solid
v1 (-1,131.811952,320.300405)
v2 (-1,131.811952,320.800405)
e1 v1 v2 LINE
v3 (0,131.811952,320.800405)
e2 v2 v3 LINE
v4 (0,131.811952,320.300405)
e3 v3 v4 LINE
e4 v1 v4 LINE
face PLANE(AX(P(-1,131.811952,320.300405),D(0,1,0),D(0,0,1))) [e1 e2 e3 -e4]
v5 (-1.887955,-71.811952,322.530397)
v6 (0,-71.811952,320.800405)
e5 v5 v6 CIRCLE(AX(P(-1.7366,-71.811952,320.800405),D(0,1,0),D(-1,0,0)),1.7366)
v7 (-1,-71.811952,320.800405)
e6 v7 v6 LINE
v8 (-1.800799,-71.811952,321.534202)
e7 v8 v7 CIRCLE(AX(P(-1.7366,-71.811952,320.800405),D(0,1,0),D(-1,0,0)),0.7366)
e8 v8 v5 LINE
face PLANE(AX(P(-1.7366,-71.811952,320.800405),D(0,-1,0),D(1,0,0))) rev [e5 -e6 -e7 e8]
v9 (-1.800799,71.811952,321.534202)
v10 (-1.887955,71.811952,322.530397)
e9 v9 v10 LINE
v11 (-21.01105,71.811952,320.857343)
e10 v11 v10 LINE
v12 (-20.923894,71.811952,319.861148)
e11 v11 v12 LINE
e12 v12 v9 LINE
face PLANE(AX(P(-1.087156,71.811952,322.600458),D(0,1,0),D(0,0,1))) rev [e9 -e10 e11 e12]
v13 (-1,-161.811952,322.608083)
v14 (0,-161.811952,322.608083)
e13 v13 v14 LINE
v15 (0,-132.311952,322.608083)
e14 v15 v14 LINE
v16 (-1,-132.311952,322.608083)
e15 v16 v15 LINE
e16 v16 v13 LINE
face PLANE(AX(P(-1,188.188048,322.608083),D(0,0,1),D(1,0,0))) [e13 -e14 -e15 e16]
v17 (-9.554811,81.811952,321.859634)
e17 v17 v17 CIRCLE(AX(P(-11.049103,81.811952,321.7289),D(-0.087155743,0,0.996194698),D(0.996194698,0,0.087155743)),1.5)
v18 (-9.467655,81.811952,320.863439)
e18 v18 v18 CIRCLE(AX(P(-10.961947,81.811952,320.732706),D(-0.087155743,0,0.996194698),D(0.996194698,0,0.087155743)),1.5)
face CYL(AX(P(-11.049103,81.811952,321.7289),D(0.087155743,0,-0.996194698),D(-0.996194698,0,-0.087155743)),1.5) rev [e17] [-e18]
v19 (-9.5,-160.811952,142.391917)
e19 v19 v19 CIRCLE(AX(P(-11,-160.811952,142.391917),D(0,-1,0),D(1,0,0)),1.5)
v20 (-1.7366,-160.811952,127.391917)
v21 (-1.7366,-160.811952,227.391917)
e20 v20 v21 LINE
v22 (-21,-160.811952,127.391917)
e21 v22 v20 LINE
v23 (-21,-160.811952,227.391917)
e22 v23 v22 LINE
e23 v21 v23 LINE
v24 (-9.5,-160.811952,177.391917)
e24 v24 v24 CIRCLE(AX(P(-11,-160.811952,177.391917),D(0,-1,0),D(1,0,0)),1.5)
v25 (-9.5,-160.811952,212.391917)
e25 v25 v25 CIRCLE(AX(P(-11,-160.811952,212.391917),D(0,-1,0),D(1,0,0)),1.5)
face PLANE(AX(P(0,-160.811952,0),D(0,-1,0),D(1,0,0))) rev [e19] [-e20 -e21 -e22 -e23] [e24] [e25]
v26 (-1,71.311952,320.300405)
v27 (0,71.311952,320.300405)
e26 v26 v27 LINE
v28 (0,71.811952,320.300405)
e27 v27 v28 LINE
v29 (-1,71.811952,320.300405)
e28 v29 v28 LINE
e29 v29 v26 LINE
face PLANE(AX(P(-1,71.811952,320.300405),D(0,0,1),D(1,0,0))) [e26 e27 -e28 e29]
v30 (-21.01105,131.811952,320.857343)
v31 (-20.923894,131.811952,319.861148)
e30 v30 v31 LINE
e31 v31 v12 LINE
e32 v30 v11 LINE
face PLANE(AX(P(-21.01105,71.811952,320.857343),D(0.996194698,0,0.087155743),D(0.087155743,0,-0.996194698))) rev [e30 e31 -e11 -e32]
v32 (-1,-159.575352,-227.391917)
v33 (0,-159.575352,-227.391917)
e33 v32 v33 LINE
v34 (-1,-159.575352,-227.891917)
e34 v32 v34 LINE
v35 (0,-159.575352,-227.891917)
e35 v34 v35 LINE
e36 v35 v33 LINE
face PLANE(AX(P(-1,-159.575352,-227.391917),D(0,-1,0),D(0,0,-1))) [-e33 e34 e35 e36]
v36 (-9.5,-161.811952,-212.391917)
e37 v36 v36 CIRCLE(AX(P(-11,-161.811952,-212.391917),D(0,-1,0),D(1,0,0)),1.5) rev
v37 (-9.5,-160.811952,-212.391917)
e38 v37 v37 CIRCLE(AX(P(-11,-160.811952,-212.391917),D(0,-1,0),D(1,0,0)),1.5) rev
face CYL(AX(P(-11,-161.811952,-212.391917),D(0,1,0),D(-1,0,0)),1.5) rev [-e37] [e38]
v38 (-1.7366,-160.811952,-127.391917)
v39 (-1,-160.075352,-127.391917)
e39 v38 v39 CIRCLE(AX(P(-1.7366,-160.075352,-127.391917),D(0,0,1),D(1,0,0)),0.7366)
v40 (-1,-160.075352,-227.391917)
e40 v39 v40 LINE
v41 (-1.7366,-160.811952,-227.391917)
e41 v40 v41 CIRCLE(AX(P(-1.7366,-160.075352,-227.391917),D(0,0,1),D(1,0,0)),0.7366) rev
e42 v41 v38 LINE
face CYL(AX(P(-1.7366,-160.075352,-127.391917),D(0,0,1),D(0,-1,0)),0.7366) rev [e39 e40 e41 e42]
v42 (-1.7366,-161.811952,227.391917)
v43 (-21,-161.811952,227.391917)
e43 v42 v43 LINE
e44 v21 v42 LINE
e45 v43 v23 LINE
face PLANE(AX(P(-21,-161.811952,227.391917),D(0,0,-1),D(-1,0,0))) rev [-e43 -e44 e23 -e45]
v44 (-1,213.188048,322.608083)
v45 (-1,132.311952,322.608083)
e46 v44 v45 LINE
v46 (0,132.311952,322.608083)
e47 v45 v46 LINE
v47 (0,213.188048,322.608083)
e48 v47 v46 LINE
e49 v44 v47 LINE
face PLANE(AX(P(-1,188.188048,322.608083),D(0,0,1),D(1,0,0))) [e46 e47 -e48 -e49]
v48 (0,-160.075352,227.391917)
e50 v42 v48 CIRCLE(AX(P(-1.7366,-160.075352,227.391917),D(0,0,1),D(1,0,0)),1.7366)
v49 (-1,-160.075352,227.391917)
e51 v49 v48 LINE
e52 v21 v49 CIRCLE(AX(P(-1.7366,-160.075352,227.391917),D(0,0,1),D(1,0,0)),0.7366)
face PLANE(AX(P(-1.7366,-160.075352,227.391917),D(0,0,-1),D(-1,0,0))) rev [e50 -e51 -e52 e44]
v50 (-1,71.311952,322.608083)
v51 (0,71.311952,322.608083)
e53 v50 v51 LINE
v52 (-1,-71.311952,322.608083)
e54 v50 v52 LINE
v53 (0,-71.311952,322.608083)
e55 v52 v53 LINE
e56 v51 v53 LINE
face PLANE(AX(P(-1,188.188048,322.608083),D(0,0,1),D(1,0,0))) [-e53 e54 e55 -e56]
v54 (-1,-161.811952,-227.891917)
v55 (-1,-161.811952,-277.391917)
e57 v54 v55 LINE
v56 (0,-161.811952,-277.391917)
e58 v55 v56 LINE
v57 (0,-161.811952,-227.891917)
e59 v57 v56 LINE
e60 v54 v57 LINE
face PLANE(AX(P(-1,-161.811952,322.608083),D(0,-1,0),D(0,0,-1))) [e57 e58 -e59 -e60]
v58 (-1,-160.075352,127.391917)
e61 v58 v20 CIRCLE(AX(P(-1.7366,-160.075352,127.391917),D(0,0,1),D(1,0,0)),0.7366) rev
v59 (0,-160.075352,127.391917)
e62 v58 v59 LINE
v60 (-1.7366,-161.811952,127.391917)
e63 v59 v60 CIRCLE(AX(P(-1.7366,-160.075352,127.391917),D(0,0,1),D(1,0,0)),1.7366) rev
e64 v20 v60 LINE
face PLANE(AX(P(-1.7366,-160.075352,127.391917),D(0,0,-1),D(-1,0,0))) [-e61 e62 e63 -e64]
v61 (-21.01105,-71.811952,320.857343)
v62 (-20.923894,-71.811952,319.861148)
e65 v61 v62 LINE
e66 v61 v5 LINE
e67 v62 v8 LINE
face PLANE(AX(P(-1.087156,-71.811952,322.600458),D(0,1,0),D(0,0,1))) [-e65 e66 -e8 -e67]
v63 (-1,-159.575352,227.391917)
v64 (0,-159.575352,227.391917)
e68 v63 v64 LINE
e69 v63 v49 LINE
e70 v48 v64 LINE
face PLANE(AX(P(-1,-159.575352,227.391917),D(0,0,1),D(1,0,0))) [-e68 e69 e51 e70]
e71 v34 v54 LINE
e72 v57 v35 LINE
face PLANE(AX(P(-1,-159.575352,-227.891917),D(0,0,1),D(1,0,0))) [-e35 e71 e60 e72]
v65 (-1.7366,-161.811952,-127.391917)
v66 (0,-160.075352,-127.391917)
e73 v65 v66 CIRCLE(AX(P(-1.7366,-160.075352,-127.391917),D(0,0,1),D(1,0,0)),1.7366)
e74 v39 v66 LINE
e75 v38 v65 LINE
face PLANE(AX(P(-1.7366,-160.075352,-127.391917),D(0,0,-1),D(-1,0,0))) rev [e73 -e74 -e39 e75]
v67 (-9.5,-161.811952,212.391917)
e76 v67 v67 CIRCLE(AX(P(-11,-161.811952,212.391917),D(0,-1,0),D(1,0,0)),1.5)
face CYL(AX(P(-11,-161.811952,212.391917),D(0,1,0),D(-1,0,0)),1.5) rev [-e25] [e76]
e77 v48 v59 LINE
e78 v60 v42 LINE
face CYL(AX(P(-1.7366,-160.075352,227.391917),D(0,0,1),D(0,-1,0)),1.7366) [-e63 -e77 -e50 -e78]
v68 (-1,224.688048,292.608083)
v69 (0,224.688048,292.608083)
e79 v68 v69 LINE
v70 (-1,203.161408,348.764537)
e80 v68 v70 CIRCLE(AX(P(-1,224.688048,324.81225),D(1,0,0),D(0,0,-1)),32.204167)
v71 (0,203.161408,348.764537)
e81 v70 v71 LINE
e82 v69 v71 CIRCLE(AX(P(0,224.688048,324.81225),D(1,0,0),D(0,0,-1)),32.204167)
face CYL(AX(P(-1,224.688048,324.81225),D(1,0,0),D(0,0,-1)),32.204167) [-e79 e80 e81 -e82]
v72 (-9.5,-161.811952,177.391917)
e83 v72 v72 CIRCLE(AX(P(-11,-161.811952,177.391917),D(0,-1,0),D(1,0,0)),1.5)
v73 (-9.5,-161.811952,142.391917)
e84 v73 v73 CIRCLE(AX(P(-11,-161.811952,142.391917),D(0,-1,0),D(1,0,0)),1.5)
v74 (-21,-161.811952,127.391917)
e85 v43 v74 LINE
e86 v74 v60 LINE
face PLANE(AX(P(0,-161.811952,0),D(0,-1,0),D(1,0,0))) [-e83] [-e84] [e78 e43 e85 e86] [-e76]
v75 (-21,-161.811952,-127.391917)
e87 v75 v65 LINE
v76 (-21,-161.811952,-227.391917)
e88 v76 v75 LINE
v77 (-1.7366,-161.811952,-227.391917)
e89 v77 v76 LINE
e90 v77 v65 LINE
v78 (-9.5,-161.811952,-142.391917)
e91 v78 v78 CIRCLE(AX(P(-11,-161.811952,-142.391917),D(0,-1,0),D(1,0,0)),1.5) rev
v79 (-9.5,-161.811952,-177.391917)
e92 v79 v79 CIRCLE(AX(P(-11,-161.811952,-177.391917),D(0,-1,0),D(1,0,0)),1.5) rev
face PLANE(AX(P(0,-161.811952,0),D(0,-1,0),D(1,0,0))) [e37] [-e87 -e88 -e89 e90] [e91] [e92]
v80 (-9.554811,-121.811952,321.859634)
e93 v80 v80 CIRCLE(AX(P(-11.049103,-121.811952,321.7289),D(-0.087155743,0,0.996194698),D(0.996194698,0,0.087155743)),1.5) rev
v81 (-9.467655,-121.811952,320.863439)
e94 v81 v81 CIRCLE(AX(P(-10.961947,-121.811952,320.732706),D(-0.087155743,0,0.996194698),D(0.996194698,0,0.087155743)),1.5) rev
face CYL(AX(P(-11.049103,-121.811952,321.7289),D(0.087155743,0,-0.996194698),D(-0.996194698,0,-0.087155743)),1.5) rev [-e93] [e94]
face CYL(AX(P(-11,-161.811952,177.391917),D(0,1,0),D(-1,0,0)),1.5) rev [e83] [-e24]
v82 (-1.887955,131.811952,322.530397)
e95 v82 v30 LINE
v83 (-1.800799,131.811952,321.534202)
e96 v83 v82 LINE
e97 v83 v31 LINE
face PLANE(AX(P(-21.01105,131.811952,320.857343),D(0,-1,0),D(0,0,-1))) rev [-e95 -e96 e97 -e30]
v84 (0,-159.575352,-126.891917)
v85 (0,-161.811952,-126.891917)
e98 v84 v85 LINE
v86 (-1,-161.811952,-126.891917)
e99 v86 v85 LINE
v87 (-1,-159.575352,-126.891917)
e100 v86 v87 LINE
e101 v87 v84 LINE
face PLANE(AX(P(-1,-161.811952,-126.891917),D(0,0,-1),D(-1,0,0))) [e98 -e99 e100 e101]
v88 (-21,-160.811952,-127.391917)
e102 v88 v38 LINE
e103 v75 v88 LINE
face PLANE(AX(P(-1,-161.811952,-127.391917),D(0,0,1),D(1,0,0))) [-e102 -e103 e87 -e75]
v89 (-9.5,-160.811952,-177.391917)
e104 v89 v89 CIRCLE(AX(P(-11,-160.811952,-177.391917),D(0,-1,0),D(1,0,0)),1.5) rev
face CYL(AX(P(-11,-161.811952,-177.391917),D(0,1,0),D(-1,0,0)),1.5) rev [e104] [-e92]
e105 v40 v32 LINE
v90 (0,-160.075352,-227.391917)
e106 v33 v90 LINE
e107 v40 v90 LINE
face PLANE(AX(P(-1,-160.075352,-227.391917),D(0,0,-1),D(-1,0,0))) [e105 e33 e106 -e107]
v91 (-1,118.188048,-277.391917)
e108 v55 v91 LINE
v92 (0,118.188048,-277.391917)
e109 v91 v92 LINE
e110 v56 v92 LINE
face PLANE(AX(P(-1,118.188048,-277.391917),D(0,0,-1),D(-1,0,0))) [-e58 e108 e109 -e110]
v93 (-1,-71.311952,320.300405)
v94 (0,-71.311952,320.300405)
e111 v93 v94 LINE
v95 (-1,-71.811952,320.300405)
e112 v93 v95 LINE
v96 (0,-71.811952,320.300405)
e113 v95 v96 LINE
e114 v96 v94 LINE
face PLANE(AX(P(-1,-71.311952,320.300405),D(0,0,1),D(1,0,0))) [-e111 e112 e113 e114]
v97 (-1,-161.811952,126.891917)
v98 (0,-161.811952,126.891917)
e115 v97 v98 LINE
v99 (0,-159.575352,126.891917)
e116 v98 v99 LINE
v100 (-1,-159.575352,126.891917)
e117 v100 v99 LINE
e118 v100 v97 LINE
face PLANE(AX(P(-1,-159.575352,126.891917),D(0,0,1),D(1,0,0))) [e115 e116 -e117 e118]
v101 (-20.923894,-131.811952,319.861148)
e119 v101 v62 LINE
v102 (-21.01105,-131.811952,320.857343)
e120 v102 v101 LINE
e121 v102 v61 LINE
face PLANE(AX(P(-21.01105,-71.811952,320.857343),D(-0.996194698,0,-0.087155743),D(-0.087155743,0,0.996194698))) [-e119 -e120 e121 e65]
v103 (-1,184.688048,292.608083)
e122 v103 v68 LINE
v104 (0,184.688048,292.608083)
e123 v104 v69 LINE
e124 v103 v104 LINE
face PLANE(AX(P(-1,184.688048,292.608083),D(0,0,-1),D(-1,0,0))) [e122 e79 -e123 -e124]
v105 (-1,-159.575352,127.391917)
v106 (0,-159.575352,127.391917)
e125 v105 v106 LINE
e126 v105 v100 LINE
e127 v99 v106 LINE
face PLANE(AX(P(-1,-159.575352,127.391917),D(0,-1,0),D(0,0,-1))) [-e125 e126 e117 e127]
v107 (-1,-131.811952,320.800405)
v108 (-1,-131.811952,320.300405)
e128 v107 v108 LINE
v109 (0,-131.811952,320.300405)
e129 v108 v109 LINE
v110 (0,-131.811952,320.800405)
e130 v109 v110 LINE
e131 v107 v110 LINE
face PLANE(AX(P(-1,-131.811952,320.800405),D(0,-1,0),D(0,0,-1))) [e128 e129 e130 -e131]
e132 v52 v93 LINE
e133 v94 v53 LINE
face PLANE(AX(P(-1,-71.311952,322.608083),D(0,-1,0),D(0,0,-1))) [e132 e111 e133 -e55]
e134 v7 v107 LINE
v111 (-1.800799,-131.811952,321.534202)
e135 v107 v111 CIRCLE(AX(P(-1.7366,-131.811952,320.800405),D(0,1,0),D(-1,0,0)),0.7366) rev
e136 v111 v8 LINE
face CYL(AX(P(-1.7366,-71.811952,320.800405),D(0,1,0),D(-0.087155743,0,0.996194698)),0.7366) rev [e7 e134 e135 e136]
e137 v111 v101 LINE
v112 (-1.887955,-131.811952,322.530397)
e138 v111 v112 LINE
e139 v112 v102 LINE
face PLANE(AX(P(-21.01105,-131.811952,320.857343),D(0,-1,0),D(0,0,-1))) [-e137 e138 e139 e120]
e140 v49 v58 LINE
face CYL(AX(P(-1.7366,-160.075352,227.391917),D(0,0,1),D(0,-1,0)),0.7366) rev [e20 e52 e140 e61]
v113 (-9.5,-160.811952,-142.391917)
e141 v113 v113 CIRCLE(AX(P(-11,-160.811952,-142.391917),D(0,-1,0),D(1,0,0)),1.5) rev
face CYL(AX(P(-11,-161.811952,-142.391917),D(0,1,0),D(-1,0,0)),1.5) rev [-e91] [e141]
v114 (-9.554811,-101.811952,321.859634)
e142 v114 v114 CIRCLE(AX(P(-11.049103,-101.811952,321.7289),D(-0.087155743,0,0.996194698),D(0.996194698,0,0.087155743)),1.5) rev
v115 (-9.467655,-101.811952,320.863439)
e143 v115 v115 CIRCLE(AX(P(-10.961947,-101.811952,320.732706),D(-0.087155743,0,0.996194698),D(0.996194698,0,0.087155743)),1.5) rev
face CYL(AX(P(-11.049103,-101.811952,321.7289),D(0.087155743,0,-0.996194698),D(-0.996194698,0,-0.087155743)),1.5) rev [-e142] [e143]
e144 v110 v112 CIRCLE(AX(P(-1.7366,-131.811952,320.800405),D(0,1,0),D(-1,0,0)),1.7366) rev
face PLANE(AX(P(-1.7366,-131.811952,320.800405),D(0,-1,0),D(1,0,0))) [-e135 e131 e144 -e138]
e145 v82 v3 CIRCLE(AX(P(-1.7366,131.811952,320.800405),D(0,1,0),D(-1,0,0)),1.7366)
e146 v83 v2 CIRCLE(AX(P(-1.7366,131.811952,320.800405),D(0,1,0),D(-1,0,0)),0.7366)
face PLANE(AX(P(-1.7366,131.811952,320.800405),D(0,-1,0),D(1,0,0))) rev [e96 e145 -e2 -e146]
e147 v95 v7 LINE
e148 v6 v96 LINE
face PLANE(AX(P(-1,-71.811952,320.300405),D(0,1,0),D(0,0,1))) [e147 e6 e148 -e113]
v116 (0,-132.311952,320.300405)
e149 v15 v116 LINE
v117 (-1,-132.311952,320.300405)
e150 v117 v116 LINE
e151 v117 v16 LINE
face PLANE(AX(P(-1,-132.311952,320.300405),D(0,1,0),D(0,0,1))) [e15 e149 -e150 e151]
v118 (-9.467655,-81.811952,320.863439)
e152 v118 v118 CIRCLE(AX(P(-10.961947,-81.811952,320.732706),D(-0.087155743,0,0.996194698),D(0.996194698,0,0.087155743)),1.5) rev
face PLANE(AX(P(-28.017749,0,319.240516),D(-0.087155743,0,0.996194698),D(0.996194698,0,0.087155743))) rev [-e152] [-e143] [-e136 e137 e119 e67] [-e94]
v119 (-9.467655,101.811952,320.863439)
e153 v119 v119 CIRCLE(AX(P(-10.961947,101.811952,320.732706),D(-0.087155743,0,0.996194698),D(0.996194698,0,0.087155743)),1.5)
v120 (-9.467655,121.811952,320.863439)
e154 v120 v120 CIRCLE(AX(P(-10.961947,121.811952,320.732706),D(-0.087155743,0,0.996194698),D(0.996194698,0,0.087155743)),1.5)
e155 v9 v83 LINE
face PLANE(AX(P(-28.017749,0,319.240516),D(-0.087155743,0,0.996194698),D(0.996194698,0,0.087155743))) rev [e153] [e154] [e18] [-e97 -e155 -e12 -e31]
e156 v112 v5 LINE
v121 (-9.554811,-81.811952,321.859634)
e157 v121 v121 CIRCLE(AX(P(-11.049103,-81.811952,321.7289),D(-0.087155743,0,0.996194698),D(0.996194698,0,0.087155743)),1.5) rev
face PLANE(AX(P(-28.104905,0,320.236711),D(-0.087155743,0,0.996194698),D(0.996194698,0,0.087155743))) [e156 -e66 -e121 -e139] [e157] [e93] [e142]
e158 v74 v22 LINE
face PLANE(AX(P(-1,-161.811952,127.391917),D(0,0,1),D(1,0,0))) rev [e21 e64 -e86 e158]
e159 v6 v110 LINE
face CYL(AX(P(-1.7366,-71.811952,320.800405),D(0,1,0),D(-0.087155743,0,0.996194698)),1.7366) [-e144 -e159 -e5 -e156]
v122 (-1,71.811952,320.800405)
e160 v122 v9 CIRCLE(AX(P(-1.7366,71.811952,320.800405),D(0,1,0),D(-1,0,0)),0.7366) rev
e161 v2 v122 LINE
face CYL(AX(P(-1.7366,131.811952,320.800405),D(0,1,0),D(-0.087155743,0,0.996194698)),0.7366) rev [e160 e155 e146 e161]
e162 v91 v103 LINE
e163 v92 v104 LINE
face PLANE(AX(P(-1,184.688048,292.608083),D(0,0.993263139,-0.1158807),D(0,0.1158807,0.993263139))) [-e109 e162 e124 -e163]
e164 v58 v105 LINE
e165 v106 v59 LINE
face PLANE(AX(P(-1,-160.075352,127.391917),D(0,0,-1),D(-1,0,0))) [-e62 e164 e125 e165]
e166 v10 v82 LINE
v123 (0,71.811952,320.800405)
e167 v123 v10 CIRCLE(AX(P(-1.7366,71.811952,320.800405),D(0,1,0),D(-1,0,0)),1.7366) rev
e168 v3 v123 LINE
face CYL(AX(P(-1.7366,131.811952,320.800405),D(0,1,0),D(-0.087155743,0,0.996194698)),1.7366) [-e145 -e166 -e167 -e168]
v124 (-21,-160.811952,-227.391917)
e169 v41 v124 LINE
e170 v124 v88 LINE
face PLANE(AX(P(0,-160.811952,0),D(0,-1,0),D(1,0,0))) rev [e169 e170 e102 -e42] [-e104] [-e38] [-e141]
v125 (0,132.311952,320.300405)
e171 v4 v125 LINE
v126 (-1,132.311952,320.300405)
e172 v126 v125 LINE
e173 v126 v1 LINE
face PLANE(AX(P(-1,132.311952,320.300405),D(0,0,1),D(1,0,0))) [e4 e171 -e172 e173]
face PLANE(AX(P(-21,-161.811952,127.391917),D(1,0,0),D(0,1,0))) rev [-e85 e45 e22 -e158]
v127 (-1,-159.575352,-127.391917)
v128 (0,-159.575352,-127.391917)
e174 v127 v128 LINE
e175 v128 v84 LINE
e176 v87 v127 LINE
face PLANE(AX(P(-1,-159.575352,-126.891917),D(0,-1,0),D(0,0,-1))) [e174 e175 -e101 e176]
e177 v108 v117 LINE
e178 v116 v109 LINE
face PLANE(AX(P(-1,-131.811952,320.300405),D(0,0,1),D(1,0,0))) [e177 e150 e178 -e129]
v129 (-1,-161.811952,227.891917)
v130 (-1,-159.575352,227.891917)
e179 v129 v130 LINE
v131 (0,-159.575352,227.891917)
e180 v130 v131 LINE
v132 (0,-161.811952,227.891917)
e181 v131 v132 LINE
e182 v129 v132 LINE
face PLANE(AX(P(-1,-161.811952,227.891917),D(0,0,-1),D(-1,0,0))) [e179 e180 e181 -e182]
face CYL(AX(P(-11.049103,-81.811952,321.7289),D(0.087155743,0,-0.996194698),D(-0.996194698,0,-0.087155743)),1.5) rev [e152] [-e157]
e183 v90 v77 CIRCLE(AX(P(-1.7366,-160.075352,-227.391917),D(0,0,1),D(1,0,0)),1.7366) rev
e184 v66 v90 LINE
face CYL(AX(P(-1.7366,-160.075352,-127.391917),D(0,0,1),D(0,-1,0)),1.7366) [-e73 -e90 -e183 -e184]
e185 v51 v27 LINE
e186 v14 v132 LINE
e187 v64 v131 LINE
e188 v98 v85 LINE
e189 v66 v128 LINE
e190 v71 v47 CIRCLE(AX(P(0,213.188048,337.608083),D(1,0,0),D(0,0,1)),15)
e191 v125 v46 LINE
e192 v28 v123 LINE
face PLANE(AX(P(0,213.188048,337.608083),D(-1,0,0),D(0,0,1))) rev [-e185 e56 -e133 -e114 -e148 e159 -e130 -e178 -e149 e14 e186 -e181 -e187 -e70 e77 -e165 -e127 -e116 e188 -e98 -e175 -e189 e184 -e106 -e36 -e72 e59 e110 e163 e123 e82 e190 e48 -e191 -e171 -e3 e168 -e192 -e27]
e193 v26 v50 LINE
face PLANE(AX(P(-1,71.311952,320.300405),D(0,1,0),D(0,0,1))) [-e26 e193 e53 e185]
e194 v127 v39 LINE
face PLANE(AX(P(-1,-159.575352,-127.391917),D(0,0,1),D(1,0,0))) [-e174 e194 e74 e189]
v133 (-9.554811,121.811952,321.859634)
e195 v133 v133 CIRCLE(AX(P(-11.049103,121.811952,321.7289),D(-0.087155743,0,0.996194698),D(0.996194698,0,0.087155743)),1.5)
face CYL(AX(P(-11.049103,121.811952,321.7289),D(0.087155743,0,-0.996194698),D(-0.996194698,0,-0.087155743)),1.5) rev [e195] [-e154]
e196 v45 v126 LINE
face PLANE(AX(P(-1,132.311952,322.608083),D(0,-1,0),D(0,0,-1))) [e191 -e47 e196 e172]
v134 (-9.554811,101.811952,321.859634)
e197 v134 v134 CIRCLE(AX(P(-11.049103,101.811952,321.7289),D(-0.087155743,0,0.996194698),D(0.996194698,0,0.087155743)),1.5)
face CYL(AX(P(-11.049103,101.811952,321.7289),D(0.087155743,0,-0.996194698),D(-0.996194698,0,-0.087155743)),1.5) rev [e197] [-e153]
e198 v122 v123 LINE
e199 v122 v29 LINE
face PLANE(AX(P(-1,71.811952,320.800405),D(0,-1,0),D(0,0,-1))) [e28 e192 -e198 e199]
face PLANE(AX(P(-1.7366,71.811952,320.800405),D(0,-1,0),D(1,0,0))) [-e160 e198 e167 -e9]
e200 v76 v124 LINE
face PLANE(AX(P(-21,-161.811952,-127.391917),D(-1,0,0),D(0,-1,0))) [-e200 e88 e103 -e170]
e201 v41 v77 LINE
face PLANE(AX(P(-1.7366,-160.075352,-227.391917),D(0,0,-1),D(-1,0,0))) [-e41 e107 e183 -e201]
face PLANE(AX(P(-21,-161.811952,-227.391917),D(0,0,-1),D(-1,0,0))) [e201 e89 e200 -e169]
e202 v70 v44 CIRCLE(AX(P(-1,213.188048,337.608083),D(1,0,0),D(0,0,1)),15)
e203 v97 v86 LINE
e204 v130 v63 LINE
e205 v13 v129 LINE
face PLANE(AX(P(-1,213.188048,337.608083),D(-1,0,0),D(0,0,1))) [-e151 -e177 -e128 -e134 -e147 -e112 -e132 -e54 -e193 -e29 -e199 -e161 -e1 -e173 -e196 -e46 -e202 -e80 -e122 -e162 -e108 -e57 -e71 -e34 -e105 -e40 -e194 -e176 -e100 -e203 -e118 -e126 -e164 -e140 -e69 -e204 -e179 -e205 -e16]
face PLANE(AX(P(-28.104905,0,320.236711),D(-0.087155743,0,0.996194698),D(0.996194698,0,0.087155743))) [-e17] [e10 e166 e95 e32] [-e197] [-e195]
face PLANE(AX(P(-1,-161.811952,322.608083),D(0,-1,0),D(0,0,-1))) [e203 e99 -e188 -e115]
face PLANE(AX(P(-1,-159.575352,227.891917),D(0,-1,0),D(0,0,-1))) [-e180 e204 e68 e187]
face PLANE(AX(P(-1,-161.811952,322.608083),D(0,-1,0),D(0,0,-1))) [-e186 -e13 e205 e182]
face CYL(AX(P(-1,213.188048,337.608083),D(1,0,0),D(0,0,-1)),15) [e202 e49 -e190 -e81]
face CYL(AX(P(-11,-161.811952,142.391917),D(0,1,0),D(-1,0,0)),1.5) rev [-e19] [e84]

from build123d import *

# Parameters (mm, degrees)
BASE_FLANGE1_DEPTH            = 1
EDGE_FLANGE1_STRIP_W          = 5.4732
EDGE_FLANGE1_STRIP_H          = 1
EDGE_FLANGE1_STRIP_CUT_DEPTH  = 100
EDGE_FLANGE1_RELIEF_W         = 5.9732
EDGE_FLANGE1_RELIEF_H         = 0.5
EDGE_FLANGE1_RELIEF_CUT_DEPTH = 1
EDGE_FLANGE1_DEPTH            = 100
EDGE_FLANGE1_PROFILE_W        = 100
EDGE_FLANGE1_PROFILE_H        = 19.2634
EDGE_FLANGE1_PROFILE_R        = 1.5
EDGE_FLANGE1_FLAT_DEPTH       = 1
EDGE_FLANGE2_START            = -132.311951656
EDGE_FLANGE2_DEPTH            = 61
EDGE_FLANGE2_2_DEPTH          = 0.5
EDGE_FLANGE2_START_2          = -71.811951656
EDGE_FLANGE2_3_DEPTH          = 0.5
EDGE_FLANGE2_START_3          = -131.811951656
EDGE_FLANGE2_4_DEPTH          = 60
EDGE_FLANGE2_START_4          = -321.467617465
EDGE_FLANGE2_5_OUTLINE_R      = 1.5
EDGE_FLANGE2_5_DEPTH          = 1.000000001


with BuildPart() as part:
    # Base-Flange1: sheet metal written as solids
    # Sketch1 → Base-Flange1 (new body)
    with BuildSketch(Plane(origin=(0, 0, 0), x_dir=(0, 0, -1), z_dir=(1, 0, 0))):
        with BuildLine():
            Line((-292.608082875, 184.688048344), (277.391917125, 118.188048344))
            Line((277.391917125, 118.188048344), (277.391917125, -161.811951656))
            Line((277.391917125, -161.811951656), (-322.608082875, -161.811951656))
            Line((-322.608082875, -161.811951656), (-322.608082875, 188.188048344))
            Line((-322.608082875, 188.188048344), (-322.608082875, 213.188048344))
            ThreePointArc((-322.608082875, 213.188048344), (-332.239042701, 199.181856584), (-348.764537222, 203.161407511))
            ThreePointArc((-348.764537222, 203.161407511), (-336.339280516, 254.75856393), (-292.608082875, 224.688048344))
            Line((-292.608082875, 224.688048344), (-292.608082875, 184.688048344))
        make_face()
    extrude(amount=-BASE_FLANGE1_DEPTH)

    # Edge-Flange1: sheet metal written as solids
    # Edge-Flange1 strip (on a plane across the edge) → Edge-Flange1 strip cut (cut)
    with BuildSketch(Plane(origin=(-1, -161.811951656, -227.391917125), x_dir=(0, 1, 0), z_dir=(0, 0, 1))):
        with Locations((-1, -0.5)):
            Rectangle(EDGE_FLANGE1_STRIP_W, EDGE_FLANGE1_STRIP_H)
    edge_flange1_strip_cut = extrude(amount=EDGE_FLANGE1_STRIP_CUT_DEPTH, mode=Mode.SUBTRACT)

    # Edge-Flange1 relief (on the sheet) → Edge-Flange1 relief cut (cut)
    with BuildSketch(Plane(origin=(-1, -160.075351656, -227.391917125), x_dir=(0, 1, 0), z_dir=(-1, 0, 0))):
        with Locations((-2.4866, 0.25)):
            Rectangle(EDGE_FLANGE1_RELIEF_W, EDGE_FLANGE1_RELIEF_H)
        with Locations((-2.4866, -100.25)):
            Rectangle(EDGE_FLANGE1_RELIEF_W, EDGE_FLANGE1_RELIEF_H)
    edge_flange1_relief_cut = extrude(amount=-EDGE_FLANGE1_RELIEF_CUT_DEPTH, mode=Mode.SUBTRACT)

    # Edge-Flange1 bend section (on a plane across the edge) → Edge-Flange1 (add)
    with BuildSketch(Plane(origin=(-1, -161.811951656, -227.391917125), x_dir=(0, 1, 0), z_dir=(0, 0, 1))):
        with BuildLine():
            Line((0, 0.7366), (1, 0.7366))
            ThreePointArc((1, 0.7366), (1.215745145, 0.215745145), (1.7366, 0))
            Line((1.7366, 0), (1.7366, -1))
            ThreePointArc((1.7366, -1), (0.508638364, -0.491361636), (0, 0.7366))
        make_face()
    edge_flange1 = extrude(amount=EDGE_FLANGE1_DEPTH)

    # Edge-Flange1 profile (on flange) → Edge-Flange1 flat (add)
    with BuildSketch(Plane(origin=(-1, -161.811951656, 0), x_dir=(0, 0, -1), z_dir=(0, 1, 0))):
        with Locations((177.391917125, 10.3683)):
            Rectangle(EDGE_FLANGE1_PROFILE_W, EDGE_FLANGE1_PROFILE_H)
        with Locations((142.391917125, 10)):
            Circle(EDGE_FLANGE1_PROFILE_R, mode=Mode.SUBTRACT)
        with Locations((212.391917125, 10)):
            Circle(EDGE_FLANGE1_PROFILE_R, mode=Mode.SUBTRACT)
        with Locations((177.391917125, 10)):
            Circle(EDGE_FLANGE1_PROFILE_R, mode=Mode.SUBTRACT)
    edge_flange1_flat = extrude(amount=EDGE_FLANGE1_FLAT_DEPTH)

    # Mirror1: Edge-Flange1 strip cut, Edge-Flange1 relief cut, Edge-Flange1, Edge-Flange1 flat across plane
    add(edge_flange1_strip_cut.mirror(Plane.XY), mode=Mode.SUBTRACT)
    add(edge_flange1_relief_cut.mirror(Plane.XY), mode=Mode.SUBTRACT)
    add(edge_flange1.mirror(Plane.XY))
    add(edge_flange1_flat.mirror(Plane.XY))

    # Edge-Flange2: read off the stored shape, not the designer's step
    # Edge-Flange2 outline → Edge-Flange2 (cut)
    with BuildSketch(Plane(origin=(0, 0, 0), x_dir=(1, 0, 0), z_dir=(0, 1, 0)).offset(EDGE_FLANGE2_START)):
        with BuildLine():
            Line((0, -322.608082875), (0, -320.800405196))
            ThreePointArc((0, -320.800405196), (-0.271171885, -321.73223136), (-1, -322.373046287))
            Line((-1, -322.373046287), (-1, -322.608082875))
            Line((-1, -322.608082875), (0, -322.608082875))
        make_face()
    edge_flange2 = extrude(amount=EDGE_FLANGE2_DEPTH, mode=Mode.SUBTRACT)

    # Edge-Flange2 2 outline → Edge-Flange2 2 (cut)
    with BuildSketch(Plane(origin=(0, 0, 0), x_dir=(1, 0, 0), z_dir=(0, 1, 0)).offset(EDGE_FLANGE2_START)):
        with BuildLine():
            Line((0, -320.300405196), (-1, -320.300405196))
            Line((-1, -320.300405196), (-1, -322.373046287))
            ThreePointArc((-1, -322.373046287), (-0.271171885, -321.73223136), (0, -320.800405196))
            Line((0, -320.800405196), (0, -320.300405196))
        make_face()
    edge_flange2_2 = extrude(amount=EDGE_FLANGE2_2_DEPTH, mode=Mode.SUBTRACT)

    # Edge-Flange2 3 outline → Edge-Flange2 3 (cut)
    with BuildSketch(Plane(origin=(0, 0, 0), x_dir=(1, 0, 0), z_dir=(0, 1, 0)).offset(EDGE_FLANGE2_START_2)):
        with BuildLine():
            Line((0, -320.300405196), (-1, -320.300405196))
            Line((-1, -320.300405196), (-1, -322.373046287))
            ThreePointArc((-1, -322.373046287), (-0.271171885, -321.73223136), (0, -320.800405196))
            Line((0, -320.800405196), (0, -320.300405196))
        make_face()
    edge_flange2_3 = extrude(amount=EDGE_FLANGE2_3_DEPTH, mode=Mode.SUBTRACT)

    # Edge-Flange2 4 outline → Edge-Flange2 4 (add)
    with BuildSketch(Plane(origin=(0, 0, 0), x_dir=(1, 0, 0), z_dir=(0, 1, 0)).offset(EDGE_FLANGE2_START_3)):
        with BuildLine():
            Line((-1, -322.373046287), (-1, -320.800405196))
            ThreePointArc((-1, -320.800405196), (-1.238960253, -321.343483682), (-1.80079892, -321.53420221))
            Line((-1.80079892, -321.53420221), (-20.923893962, -319.861148183))
            Line((-20.923893962, -319.861148183), (-21.011049705, -320.857342881))
            Line((-21.011049705, -320.857342881), (-1.887954663, -322.530396908))
            ThreePointArc((-1.887954663, -322.530396908), (-1.433585428, -322.510364765), (-1, -322.373046287))
        make_face()
    edge_flange2_4 = extrude(amount=EDGE_FLANGE2_4_DEPTH)

    # Edge-Flange2 5 outline → Edge-Flange2 5 (cut)
    with BuildSketch(Plane(origin=(0, 0, 0), x_dir=(0.9961946980917458, 0, 0.0871557427476548), z_dir=(0.0871557427476548, 0, -0.9961946980917459)).offset(EDGE_FLANGE2_START_4)):
        with Locations((17.033463718, 121.811951656)):
            Circle(EDGE_FLANGE2_5_OUTLINE_R)
        with Locations((17.033463718, 101.811951656)):
            Circle(EDGE_FLANGE2_5_OUTLINE_R)
        with Locations((17.033463718, 81.811951656)):
            Circle(EDGE_FLANGE2_5_OUTLINE_R)
    edge_flange2_5 = extrude(amount=EDGE_FLANGE2_5_DEPTH, mode=Mode.SUBTRACT)

    # Mirror2: Edge-Flange2, Edge-Flange2 2, Edge-Flange2 3, Edge-Flange2 4, Edge-Flange2 5 across plane
    add(edge_flange2.mirror(Plane.ZX), mode=Mode.SUBTRACT)
    add(edge_flange2_2.mirror(Plane.ZX), mode=Mode.SUBTRACT)
    add(edge_flange2_3.mirror(Plane.ZX), mode=Mode.SUBTRACT)
    add(edge_flange2_4.mirror(Plane.ZX))
    add(edge_flange2_5.mirror(Plane.ZX), mode=Mode.SUBTRACT)


solid = part.part
